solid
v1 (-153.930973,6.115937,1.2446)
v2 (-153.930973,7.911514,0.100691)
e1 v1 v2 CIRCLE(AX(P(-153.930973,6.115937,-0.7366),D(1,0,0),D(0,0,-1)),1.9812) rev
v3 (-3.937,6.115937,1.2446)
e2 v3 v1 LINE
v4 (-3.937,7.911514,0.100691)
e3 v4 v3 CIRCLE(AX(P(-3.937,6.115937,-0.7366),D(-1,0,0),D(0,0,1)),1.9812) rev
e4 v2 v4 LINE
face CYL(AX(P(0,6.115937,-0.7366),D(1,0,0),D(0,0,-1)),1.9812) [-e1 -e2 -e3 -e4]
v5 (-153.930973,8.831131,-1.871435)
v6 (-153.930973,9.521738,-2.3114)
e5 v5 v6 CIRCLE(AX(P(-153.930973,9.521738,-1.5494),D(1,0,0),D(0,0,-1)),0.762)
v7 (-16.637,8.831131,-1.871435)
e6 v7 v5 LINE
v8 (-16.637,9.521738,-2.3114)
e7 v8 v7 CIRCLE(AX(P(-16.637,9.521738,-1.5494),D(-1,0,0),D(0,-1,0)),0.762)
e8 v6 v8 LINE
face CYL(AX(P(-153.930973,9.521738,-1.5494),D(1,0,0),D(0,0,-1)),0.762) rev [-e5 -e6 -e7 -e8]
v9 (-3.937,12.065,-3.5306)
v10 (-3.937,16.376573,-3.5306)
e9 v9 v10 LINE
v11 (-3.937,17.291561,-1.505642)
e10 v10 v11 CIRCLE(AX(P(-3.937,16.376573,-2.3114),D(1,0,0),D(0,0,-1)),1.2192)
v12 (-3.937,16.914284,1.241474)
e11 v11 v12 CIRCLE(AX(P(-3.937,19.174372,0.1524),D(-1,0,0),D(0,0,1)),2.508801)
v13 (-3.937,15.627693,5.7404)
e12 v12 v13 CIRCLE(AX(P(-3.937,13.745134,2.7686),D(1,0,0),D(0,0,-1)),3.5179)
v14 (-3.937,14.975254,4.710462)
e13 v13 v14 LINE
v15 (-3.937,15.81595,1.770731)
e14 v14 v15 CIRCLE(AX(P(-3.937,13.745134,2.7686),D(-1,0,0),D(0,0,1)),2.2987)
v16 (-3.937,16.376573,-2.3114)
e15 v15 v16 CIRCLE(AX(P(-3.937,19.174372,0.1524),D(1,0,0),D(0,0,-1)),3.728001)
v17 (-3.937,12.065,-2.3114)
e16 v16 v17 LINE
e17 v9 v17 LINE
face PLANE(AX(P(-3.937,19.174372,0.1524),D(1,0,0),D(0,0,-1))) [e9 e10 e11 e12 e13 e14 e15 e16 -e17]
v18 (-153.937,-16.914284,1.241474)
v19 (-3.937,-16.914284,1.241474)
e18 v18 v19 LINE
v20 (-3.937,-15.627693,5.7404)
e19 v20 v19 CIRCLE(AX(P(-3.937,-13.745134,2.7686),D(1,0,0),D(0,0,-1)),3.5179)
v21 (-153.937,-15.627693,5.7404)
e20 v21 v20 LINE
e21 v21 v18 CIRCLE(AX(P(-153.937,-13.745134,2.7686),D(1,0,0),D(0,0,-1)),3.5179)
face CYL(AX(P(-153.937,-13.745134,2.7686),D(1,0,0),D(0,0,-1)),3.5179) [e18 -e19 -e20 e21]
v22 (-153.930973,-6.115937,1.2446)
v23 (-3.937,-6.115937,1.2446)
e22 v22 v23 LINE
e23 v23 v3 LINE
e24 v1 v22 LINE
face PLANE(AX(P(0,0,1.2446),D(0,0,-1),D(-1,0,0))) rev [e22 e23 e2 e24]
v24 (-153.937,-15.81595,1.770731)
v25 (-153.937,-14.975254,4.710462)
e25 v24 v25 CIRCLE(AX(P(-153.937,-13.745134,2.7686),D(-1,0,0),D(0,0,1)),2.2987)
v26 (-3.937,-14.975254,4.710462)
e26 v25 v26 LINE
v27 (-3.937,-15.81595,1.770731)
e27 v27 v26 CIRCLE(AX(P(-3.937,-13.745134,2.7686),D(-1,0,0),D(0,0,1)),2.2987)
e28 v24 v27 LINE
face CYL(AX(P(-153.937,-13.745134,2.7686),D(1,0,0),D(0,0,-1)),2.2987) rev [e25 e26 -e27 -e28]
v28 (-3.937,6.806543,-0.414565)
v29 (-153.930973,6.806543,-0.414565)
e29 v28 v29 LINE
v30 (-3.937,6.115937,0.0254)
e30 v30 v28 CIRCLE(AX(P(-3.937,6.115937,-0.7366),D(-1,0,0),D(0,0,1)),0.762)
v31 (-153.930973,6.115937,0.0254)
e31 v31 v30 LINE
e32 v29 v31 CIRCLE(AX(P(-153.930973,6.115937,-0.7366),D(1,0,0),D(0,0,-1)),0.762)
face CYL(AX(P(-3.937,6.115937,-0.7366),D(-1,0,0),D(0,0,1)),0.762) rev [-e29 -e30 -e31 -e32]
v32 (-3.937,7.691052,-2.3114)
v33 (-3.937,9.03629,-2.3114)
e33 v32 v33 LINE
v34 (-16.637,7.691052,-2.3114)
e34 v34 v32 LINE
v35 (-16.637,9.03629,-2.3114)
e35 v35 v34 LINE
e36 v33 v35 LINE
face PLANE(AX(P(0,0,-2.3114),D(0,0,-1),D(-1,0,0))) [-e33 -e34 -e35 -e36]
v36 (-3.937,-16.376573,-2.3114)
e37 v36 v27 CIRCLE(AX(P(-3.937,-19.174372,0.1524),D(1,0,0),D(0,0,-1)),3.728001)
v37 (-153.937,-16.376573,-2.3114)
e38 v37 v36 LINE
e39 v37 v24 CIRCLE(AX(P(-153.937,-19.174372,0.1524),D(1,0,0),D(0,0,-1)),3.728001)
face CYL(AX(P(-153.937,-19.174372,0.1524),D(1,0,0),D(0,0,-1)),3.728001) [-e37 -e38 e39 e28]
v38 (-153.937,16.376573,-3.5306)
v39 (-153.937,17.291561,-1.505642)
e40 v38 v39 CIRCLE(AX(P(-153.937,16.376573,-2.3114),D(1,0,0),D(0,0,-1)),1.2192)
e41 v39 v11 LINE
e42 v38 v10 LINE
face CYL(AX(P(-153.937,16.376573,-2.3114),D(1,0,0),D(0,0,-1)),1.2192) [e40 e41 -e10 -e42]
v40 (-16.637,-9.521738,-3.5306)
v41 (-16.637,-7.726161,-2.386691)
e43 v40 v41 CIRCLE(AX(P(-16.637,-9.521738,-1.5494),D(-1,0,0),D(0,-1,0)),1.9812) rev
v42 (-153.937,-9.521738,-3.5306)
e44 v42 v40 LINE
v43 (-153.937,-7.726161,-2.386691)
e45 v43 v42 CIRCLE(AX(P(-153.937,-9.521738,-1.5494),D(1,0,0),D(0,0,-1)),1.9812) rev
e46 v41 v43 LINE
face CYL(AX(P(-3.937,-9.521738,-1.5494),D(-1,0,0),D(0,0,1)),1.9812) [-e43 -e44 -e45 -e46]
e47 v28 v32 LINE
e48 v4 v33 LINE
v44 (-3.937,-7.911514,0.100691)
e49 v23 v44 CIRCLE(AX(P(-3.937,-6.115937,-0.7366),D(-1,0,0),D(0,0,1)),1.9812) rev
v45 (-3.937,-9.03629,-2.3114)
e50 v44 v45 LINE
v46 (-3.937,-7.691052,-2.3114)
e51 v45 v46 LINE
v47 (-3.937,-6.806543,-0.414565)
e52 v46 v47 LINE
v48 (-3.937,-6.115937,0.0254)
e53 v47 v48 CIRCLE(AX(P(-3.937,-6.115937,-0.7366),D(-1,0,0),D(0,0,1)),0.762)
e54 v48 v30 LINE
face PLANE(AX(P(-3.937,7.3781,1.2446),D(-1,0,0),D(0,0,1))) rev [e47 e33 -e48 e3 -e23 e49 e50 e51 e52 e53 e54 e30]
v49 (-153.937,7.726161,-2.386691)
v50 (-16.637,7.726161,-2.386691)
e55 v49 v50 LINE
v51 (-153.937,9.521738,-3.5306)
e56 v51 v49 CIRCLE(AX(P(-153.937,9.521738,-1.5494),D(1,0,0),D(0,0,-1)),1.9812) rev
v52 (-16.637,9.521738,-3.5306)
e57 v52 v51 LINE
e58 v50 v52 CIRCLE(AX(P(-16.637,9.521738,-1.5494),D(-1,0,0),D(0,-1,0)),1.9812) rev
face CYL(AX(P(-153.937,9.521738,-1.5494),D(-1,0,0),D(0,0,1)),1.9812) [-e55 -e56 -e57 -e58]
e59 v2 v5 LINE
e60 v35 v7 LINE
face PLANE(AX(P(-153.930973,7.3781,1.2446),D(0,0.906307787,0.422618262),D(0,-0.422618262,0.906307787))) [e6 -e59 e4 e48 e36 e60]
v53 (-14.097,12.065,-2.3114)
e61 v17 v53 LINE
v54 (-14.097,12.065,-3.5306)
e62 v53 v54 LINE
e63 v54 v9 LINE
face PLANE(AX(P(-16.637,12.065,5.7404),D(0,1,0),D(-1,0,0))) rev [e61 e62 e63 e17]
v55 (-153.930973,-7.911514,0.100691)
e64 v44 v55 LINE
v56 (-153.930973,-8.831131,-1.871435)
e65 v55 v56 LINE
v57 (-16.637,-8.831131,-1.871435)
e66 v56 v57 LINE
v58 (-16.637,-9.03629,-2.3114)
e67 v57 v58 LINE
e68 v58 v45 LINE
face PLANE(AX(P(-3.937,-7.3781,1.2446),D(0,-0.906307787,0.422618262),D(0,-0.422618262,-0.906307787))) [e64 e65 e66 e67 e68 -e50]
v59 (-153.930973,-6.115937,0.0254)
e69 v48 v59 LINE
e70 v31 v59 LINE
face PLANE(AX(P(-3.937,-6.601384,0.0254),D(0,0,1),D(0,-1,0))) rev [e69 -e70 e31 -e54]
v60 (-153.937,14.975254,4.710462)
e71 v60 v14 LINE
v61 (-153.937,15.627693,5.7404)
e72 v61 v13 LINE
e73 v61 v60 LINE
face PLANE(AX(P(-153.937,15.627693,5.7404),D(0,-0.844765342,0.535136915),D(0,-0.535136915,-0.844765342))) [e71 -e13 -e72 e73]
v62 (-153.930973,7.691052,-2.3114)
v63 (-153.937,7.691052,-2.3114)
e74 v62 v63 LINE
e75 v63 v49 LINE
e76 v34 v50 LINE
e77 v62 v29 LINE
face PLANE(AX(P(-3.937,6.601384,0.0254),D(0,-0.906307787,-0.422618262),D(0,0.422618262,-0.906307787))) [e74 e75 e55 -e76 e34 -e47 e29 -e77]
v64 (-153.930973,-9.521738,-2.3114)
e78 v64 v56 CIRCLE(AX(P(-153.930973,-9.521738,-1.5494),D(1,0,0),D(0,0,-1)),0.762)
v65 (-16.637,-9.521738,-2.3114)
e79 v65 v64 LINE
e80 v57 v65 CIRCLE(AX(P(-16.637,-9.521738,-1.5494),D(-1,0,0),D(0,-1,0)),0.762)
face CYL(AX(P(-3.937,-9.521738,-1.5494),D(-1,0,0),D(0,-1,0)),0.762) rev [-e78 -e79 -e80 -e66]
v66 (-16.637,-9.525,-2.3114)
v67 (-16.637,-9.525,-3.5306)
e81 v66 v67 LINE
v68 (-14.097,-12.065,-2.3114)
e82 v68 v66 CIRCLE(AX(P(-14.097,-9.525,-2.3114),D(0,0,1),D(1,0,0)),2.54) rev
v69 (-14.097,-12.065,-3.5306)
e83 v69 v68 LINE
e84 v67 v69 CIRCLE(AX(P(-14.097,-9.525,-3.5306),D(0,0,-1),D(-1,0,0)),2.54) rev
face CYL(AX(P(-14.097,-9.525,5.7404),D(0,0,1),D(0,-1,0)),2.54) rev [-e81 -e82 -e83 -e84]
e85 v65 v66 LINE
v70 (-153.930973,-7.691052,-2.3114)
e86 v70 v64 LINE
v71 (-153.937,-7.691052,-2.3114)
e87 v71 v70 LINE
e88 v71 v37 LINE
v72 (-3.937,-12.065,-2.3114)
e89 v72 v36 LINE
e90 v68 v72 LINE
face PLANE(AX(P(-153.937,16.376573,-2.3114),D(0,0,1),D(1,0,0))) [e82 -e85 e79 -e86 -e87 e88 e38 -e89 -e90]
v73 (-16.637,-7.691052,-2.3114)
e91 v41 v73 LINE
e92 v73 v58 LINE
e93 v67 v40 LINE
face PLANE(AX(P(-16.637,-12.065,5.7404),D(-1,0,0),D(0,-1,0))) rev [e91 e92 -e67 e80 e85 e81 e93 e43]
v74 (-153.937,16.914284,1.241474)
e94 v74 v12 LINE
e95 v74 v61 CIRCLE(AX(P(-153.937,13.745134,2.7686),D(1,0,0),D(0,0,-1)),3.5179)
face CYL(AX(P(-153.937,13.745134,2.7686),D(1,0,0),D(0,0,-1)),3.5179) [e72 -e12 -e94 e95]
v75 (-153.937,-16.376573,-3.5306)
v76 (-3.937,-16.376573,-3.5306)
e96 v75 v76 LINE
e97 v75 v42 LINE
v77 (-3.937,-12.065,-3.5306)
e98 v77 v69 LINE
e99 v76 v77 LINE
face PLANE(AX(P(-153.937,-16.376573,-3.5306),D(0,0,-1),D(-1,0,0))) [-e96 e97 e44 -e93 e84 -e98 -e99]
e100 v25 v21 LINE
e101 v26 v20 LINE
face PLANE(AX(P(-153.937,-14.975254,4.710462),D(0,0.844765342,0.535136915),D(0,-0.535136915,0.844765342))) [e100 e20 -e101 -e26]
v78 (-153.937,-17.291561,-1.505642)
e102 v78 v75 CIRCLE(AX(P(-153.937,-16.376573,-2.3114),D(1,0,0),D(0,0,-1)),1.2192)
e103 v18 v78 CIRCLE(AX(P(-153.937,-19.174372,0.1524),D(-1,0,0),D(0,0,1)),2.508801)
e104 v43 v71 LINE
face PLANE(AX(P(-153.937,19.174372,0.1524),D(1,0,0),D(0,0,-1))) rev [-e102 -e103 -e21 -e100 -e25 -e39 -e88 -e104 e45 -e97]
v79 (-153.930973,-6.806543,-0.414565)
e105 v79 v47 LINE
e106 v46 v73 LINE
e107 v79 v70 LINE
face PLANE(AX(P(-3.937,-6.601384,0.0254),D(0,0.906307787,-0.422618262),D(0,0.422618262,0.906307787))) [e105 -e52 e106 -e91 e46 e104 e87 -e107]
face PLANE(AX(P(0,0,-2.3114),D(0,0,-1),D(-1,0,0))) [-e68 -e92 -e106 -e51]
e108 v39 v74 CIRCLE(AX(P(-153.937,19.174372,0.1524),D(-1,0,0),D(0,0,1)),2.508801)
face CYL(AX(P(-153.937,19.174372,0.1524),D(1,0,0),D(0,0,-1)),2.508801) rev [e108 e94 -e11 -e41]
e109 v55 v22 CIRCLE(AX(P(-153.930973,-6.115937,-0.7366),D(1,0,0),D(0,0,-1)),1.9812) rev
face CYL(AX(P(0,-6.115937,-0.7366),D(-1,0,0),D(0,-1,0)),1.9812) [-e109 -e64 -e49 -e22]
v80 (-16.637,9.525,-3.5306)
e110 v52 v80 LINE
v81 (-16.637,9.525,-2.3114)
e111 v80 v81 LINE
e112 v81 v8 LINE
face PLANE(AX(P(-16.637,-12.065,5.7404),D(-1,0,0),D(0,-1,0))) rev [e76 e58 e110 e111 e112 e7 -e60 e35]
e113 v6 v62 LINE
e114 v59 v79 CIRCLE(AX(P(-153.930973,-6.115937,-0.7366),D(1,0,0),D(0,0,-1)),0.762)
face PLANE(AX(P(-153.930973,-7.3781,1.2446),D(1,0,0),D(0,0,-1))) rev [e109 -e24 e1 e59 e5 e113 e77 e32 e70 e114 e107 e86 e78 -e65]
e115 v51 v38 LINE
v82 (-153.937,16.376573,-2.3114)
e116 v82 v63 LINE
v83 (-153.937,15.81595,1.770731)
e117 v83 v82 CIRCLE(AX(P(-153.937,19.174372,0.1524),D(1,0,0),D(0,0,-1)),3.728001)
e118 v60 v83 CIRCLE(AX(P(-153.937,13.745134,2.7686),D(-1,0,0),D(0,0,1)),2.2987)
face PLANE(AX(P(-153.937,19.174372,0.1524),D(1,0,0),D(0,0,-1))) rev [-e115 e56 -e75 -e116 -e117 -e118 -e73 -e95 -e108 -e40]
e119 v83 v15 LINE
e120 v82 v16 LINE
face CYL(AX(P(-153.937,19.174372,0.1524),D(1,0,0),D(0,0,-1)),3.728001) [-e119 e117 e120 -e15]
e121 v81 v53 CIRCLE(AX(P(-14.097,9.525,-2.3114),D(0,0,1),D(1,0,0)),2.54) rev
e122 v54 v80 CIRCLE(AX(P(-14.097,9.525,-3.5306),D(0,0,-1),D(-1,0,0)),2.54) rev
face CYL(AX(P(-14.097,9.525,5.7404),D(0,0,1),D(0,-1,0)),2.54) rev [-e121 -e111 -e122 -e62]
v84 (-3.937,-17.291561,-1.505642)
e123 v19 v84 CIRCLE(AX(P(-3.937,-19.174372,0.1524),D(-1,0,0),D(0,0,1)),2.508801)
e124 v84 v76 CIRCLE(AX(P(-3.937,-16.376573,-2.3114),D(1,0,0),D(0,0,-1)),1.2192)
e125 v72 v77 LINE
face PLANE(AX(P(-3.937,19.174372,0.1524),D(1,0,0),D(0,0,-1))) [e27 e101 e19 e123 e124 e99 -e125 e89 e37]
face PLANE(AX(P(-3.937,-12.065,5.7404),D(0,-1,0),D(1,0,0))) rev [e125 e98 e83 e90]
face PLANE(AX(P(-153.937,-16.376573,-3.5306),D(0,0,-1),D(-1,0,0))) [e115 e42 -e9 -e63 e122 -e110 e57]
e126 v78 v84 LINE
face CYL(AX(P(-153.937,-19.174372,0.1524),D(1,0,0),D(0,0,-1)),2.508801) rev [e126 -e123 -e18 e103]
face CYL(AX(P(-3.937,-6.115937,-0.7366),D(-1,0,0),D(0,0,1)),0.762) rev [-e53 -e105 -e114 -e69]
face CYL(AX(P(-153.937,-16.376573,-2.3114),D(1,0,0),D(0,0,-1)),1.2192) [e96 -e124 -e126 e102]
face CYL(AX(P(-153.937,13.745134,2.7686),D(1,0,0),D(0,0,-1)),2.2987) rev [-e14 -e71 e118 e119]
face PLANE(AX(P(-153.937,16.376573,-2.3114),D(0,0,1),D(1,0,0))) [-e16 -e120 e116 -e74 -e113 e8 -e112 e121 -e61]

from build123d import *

# Parameters (mm, degrees)
BOSS_EXTRUDE1_DEPTH = 150
SKETCH2_W           = 12.7
SKETCH2_H           = 24.13
CUT_EXTRUDE1_DEPTH  = 156.216502449
SKETCH3_W           = 149.993973466
SKETCH3_H           = 14.75620072
BOSS_EXTRUDE2_DEPTH = 3.55599999
SKETCH4_W           = 3.55599999
SKETCH4_H           = 13.202768596
CUT_EXTRUDE2_DEPTH  = 152.137564539
DRAFT1_START        = -153.930973466
DRAFT1_DEPTH        = 149.993973466
DRAFT2_START        = -153.937
DRAFT2_DEPTH        = 150
FILLET1_R           = 0.76200009
FILLET2_R           = 1.98120009
FILLET3_R           = 2.54


# Read off the part's stored shape, not the designer's step: Draft1, Draft2
with BuildPart() as part:
    # Sketch1 → Boss-Extrude1 (new body)
    with BuildSketch(Plane(origin=(-3.937, 0, 0), x_dir=(0, 0, -1), z_dir=(1, 0, 0))):
        with BuildLine():
            Line((2.311399989, 16.37657286), (2.311399989, -16.37657286))
            ThreePointArc((2.311399989, -16.37657286), (0.354826715, -15.481038557), (-1.770730805, -15.815950332))
            ThreePointArc((-1.770730805, -15.815950332), (-3.400639082, -15.955235788), (-4.710462095, -14.975253591))
            Line((-4.710462095, -14.975253591), (-5.7404, -15.627692517))
            ThreePointArc((-5.7404, -15.627692517), (-3.73586423, -17.127444277), (-1.241474216, -16.914283663))
            ThreePointArc((-1.241474216, -16.914283663), (0.188944014, -16.688900954), (1.505642365, -17.291560998))
            ThreePointArc((1.505642365, -17.291560998), (2.81343034, -17.487614789), (3.53059999, -16.37657286))
            Line((3.53059999, -16.37657286), (3.53059999, 16.37657286))
            ThreePointArc((3.53059999, 16.37657286), (2.81343034, 17.487614789), (1.505642365, 17.291560998))
            ThreePointArc((1.505642365, 17.291560998), (0.188944014, 16.688900954), (-1.241474216, 16.914283663))
            ThreePointArc((-1.241474216, 16.914283663), (-3.73586423, 17.127444277), (-5.7404, 15.627692517))
            Line((-5.7404, 15.627692517), (-4.710462095, 14.975253591))
            ThreePointArc((-4.710462095, 14.975253591), (-3.400639082, 15.955235788), (-1.770730805, 15.815950332))
            ThreePointArc((-1.770730805, 15.815950332), (0.354826715, 15.481038557), (2.311399989, 16.37657286))
        make_face()
    extrude(amount=-BOSS_EXTRUDE1_DEPTH)

    # Sketch2 → Cut-Extrude1 (cut, through all)
    with BuildSketch(Plane(origin=(0, 0, -3.53059999), x_dir=(-1, 0, 0), z_dir=(0, 0, -1))):
        with Locations((10.287, 0)):
            Rectangle(SKETCH2_W, SKETCH2_H)
    extrude(amount=-CUT_EXTRUDE1_DEPTH, mode=Mode.SUBTRACT)

    # Sketch3 → Boss-Extrude2 (add)
    with BuildSketch(Plane.XY.offset(-2.311399989)):
        with Locations((-78.933986733, 0)):
            Rectangle(SKETCH3_W, SKETCH3_H)
    extrude(amount=BOSS_EXTRUDE2_DEPTH)

    # Sketch4 → Cut-Extrude2 (cut, through all)
    with BuildSketch(Plane.ZY.offset(153.937)):
        with Locations((-1.752599995, 0)):
            Rectangle(SKETCH4_W, SKETCH4_H)
    extrude(amount=-CUT_EXTRUDE2_DEPTH, mode=Mode.SUBTRACT)

    # Draft1 outline → Draft1 (add)
    with BuildSketch(Plane.YZ.offset(DRAFT1_START)):
        Polygon((7.37810036, 1.244600001), (7.37810036, -2.311399989), (9.036290388, -2.311399989), align=None)
        Polygon((-7.37810036, 1.244600001), (-9.036290388, -2.311399989), (-7.37810036, -2.311399989), align=None)
    extrude(amount=DRAFT1_DEPTH)

    # Draft2 outline → Draft2 (cut)
    with BuildSketch(Plane.YZ.offset(DRAFT2_START)):
        Polygon((6.601384298, 0.0254), (6.601384298, -3.53059999), (8.259574326, -3.53059999), align=None)
        Polygon((-8.259574326, -3.53059999), (-6.601384298, -3.53059999), (-6.601384298, 0.0254), align=None)
    extrude(amount=DRAFT2_DEPTH, mode=Mode.SUBTRACT)

    # Fillet1
    fillet1_edges = [part.edges().sort_by_distance(p)[0] for p in [
        (-85.283986733, -9.036290388, -2.311399989),
        (-85.283986733, 9.036290388, -2.311399989),
        (-78.933986733, 6.601384298, 0.0254),
        (-78.933986733, -6.601384298, 0.0254),
    ]]
    fillet(fillet1_edges, radius=FILLET1_R)

    # Fillet2
    fillet2_edges = [part.edges().sort_by_distance(p)[0] for p in [
        (-78.933986733, -7.37810036, 1.244600001),
        (-78.933986733, 7.37810036, 1.244600001),
        (-85.287, -8.259574326, -3.53059999),
        (-85.287, 8.259574326, -3.53059999),
    ]]
    fillet(fillet2_edges, radius=FILLET2_R)

    # Fillet3
    fillet3_edges = [part.edges().sort_by_distance(p)[0] for p in [
        (-16.637, 12.065, -2.92099999),
        (-16.637, -12.065, -2.92099999),
    ]]
    fillet(fillet3_edges, radius=FILLET3_R)


solid = part.part
